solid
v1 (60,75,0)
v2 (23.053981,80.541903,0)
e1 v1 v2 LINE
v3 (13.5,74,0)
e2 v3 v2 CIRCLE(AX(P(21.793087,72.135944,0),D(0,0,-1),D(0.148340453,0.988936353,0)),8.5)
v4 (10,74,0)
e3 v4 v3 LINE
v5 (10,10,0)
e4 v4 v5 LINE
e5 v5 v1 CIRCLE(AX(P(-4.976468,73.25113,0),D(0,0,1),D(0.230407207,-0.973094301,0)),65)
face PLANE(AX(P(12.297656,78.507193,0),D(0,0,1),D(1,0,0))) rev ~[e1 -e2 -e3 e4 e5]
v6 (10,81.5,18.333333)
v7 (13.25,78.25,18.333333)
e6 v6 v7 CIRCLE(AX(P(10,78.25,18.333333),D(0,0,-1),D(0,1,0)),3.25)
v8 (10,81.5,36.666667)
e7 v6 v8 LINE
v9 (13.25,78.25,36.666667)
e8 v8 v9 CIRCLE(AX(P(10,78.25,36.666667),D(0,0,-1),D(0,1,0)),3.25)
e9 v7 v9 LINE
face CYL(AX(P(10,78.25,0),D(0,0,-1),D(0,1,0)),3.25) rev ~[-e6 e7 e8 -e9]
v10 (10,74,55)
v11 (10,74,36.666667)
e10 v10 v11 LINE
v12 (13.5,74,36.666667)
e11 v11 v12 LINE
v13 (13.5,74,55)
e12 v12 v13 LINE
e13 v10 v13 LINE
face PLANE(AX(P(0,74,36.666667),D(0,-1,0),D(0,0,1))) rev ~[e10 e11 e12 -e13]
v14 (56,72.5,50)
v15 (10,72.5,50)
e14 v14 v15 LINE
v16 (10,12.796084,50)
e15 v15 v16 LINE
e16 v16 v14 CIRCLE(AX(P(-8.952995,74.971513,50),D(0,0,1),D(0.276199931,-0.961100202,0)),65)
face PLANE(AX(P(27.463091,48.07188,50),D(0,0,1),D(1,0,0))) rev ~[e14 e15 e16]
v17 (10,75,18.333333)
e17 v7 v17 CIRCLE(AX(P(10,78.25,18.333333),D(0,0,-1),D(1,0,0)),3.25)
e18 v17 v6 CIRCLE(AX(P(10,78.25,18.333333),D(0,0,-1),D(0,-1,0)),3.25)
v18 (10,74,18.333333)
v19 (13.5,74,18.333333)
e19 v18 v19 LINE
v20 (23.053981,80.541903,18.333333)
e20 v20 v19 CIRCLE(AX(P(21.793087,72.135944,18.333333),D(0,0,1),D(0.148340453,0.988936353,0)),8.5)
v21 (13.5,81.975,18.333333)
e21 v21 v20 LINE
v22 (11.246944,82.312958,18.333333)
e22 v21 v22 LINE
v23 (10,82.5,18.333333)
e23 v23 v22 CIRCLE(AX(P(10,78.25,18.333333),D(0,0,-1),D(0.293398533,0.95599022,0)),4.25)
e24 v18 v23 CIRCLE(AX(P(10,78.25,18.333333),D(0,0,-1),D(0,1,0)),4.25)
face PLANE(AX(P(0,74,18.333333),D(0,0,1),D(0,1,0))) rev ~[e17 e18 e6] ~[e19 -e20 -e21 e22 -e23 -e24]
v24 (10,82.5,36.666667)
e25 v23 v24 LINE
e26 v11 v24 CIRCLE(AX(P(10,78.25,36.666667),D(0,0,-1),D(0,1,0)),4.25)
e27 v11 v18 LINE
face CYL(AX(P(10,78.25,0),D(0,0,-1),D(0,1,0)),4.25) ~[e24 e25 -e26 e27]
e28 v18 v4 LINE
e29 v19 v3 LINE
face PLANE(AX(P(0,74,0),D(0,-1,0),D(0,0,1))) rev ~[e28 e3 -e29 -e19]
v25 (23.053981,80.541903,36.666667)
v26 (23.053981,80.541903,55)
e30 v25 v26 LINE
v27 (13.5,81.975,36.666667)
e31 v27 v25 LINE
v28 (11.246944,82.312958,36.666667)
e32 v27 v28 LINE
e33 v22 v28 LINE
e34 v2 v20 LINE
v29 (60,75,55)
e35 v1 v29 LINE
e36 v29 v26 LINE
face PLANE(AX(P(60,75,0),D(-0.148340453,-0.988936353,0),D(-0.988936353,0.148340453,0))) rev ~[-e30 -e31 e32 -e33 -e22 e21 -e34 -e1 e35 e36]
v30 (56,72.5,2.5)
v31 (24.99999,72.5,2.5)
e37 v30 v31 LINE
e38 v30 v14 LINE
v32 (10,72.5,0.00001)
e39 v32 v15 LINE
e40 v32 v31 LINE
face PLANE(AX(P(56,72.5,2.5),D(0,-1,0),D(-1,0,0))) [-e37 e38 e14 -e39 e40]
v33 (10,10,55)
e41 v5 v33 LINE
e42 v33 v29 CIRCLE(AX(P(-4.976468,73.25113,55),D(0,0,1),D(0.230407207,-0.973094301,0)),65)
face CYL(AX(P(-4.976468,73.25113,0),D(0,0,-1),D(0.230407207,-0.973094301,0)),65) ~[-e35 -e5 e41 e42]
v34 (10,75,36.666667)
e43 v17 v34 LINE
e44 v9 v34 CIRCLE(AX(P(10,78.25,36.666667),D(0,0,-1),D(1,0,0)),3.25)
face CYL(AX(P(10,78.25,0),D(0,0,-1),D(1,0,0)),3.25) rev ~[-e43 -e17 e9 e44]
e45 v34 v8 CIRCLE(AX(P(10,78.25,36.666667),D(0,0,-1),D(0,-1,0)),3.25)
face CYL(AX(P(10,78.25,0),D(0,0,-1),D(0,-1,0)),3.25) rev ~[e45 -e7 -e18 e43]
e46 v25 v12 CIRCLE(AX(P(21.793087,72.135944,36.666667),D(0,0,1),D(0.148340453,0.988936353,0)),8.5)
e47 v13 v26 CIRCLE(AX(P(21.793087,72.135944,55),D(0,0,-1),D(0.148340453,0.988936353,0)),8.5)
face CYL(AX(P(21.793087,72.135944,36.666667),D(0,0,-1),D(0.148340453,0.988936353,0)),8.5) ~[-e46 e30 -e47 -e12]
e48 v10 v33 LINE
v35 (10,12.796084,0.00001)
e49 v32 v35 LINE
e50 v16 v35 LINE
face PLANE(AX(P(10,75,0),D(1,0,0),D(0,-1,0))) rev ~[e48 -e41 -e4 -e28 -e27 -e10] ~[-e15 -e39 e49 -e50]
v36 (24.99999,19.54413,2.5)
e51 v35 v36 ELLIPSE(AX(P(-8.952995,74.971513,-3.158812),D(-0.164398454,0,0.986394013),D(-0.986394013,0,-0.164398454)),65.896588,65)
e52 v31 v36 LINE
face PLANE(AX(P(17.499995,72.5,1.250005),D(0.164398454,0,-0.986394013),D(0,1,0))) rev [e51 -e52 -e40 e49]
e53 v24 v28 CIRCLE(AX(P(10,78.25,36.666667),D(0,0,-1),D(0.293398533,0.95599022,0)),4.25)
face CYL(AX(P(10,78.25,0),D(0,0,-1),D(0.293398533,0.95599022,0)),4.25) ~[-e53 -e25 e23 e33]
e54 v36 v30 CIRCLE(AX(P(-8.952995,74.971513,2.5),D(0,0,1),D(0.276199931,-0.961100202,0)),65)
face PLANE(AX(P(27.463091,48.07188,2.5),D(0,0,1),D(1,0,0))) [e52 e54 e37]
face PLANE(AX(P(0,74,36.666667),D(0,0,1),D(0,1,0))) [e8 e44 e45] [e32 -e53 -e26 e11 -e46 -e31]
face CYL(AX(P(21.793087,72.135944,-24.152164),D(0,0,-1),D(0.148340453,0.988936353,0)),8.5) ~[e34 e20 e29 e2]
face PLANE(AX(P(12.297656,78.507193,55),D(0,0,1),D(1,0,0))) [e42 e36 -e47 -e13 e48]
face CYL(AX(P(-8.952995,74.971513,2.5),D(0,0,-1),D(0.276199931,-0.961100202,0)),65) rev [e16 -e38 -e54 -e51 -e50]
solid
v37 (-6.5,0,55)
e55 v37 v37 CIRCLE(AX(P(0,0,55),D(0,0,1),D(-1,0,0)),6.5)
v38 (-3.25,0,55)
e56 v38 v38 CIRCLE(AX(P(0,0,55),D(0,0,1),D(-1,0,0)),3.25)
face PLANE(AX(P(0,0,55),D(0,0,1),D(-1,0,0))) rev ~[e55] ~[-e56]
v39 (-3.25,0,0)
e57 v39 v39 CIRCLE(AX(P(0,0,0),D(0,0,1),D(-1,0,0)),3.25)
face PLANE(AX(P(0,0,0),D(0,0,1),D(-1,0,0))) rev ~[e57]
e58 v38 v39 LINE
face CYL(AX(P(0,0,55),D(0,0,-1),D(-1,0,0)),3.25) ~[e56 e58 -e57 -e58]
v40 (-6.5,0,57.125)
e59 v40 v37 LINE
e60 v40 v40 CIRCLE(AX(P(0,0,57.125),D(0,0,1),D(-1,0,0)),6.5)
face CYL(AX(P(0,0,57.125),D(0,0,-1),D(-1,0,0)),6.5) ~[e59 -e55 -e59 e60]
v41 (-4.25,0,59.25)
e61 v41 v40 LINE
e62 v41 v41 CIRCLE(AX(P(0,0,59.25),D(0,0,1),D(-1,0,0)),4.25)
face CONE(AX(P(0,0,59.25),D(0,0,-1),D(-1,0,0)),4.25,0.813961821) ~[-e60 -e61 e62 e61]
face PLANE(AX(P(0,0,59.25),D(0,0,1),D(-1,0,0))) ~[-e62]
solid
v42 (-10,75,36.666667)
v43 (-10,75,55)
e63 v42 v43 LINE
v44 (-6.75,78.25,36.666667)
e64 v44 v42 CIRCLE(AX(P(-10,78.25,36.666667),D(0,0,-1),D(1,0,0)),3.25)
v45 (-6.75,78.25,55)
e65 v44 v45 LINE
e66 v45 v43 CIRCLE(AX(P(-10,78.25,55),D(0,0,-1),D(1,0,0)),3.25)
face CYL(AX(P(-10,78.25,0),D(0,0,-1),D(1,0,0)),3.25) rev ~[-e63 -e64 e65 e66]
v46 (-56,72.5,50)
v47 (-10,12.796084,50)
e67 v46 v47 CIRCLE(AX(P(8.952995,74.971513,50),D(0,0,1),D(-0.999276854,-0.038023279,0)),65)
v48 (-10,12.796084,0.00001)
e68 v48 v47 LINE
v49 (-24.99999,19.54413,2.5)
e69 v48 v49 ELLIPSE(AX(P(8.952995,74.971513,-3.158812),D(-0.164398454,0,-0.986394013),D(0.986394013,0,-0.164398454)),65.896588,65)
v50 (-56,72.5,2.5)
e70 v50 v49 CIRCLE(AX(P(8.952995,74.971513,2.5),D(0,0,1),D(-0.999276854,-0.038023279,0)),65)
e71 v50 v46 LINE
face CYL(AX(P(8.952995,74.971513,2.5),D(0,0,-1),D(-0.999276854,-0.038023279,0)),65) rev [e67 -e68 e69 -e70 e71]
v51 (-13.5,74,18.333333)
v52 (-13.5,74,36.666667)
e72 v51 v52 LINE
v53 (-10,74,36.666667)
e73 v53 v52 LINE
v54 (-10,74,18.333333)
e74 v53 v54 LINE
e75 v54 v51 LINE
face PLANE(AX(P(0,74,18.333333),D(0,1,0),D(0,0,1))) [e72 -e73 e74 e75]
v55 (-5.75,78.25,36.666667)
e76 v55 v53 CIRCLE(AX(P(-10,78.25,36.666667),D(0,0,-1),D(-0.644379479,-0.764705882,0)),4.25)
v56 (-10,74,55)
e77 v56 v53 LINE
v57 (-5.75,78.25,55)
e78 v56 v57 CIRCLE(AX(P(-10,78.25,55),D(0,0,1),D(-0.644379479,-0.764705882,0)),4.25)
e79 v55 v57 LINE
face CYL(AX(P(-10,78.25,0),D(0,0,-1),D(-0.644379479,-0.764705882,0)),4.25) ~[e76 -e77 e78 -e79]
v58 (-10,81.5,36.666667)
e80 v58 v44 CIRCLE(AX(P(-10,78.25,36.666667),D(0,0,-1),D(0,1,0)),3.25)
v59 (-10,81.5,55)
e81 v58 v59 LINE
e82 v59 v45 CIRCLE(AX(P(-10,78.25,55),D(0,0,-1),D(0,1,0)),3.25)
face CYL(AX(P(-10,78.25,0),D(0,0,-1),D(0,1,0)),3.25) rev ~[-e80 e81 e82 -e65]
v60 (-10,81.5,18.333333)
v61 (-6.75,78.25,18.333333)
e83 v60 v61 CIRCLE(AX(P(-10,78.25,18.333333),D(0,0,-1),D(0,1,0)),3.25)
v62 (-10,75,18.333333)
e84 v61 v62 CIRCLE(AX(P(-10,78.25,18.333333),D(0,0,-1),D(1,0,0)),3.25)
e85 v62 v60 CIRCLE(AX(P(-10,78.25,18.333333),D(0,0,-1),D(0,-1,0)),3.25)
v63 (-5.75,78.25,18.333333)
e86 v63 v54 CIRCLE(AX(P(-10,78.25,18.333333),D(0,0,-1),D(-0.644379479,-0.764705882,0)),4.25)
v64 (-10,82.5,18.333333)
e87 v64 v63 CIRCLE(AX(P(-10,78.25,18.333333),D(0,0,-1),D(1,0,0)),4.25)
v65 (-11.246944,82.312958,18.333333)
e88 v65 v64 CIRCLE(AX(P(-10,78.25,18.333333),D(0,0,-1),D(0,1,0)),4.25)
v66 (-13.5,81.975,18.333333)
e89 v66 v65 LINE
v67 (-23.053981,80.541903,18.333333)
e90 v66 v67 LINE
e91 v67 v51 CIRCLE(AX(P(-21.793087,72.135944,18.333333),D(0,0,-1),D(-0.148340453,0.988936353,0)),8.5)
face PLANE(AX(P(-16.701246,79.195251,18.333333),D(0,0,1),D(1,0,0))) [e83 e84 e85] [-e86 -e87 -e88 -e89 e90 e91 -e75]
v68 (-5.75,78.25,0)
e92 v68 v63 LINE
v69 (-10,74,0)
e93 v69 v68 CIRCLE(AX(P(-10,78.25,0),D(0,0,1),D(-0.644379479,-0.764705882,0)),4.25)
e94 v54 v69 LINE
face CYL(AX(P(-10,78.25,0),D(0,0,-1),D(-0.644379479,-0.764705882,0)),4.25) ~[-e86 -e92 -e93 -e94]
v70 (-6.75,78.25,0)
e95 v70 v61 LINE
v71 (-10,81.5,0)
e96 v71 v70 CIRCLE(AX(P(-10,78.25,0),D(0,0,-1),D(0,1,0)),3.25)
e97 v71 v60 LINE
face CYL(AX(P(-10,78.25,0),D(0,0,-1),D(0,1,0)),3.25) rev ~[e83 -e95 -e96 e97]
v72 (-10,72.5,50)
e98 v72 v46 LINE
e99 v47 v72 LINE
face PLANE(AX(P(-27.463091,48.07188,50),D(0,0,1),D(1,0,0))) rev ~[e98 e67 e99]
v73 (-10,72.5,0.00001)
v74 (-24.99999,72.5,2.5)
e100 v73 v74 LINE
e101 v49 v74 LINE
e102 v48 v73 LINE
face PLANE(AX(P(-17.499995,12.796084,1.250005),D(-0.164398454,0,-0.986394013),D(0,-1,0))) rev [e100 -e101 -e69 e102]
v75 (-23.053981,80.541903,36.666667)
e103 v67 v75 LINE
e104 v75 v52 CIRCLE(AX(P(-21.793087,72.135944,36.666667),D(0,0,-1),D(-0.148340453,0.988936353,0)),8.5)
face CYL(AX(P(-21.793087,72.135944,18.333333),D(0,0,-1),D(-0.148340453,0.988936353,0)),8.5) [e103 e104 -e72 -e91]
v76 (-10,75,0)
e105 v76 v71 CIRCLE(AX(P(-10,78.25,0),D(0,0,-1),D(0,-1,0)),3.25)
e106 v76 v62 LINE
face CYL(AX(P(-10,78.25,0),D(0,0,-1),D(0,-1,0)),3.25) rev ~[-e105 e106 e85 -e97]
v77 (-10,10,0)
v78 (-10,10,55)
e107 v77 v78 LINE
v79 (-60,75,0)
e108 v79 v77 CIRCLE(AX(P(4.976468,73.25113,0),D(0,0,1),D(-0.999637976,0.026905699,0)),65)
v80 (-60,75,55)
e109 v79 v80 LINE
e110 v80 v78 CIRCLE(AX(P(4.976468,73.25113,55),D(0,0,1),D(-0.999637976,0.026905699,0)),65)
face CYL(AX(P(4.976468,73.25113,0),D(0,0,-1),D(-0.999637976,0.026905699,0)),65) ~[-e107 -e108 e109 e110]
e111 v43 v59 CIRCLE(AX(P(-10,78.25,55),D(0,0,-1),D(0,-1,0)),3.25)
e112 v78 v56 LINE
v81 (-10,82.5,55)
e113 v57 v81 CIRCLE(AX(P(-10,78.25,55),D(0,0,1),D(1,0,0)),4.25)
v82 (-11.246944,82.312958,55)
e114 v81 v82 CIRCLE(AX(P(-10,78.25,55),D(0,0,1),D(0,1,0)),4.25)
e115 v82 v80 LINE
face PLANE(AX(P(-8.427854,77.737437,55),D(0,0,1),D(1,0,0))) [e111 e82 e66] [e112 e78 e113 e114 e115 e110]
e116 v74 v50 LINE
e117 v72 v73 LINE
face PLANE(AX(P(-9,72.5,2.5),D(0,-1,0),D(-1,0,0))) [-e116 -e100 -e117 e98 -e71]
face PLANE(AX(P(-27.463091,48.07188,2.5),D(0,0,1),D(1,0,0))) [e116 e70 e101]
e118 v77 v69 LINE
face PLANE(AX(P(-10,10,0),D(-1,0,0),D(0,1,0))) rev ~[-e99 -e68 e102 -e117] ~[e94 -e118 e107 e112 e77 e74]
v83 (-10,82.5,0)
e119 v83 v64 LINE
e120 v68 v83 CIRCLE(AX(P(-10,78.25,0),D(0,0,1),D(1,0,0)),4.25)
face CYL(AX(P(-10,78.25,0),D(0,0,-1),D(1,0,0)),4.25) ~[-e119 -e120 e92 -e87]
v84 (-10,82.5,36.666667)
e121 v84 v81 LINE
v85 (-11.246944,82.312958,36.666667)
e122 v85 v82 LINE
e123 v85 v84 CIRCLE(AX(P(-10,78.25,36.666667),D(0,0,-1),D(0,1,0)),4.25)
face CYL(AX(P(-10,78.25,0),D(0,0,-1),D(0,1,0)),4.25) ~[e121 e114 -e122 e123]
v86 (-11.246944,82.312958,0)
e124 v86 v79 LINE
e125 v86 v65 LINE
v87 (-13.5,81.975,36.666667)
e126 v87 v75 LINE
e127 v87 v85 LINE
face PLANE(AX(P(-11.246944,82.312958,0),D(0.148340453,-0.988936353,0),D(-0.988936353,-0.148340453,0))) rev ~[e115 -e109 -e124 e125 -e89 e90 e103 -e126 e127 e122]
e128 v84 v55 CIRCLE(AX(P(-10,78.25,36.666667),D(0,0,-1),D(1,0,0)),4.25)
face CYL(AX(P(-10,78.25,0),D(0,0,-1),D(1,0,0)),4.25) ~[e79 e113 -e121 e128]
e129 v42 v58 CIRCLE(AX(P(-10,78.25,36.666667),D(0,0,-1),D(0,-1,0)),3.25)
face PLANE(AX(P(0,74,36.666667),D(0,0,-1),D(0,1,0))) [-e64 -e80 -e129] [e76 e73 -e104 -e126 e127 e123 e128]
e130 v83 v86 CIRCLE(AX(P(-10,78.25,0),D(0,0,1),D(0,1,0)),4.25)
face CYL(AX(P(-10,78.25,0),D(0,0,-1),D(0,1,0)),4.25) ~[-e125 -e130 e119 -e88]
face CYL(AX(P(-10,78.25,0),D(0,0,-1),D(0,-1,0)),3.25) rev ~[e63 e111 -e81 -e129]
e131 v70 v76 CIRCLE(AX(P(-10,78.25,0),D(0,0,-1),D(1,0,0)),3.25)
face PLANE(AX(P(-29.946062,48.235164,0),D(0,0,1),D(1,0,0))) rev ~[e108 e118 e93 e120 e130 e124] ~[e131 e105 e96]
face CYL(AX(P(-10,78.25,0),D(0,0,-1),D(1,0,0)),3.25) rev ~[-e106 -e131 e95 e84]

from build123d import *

# Parameters (mm, degrees)
F2_DEPTH      = 55
F3_START      = 2.5
F3_DEPTH      = 47.5
F4_SIZE2      = 14.99999
F4_SIZE       = 2.49999
F4_2_SIZE2    = 14.99999
F4_2_SIZE     = 2.49999
F7_DEPTH      = 55
F8_W          = 8.5
F8_H          = 18.3333333333
F9_DEPTH      = 13.5
F10_DEPTH     = 13.5
F13_T1_DEPTH  = 42.4854968764
F13_T3_DEPTH  = 42.4854968764
F13_T8_DEPTH  = 66.6376604194
F13_T13_DEPTH = 66.6376604194
F14_T1_DEPTH  = 18.3333333333


# Not quite as in the source:
# - a fillet or chamfer that OpenCascade refuses, or shapes differently, is made with other operations: its cross-section is extruded or revolved along the edge and cut away or added
# - two fillets or chamfers of one size are made in one step
# - a fillet or chamfer is up to 0.001 mm smaller than in the source, because OpenCascade refuses the exact size


with BuildPart() as f2:
    # F0 (on Top) → F2 (new body)
    with BuildSketch(Plane.XY):
        with BuildLine():
            ThreePointArc((-60, 75), (-46.5440908417, 33.6199301218), (-10, 10))
            Line((-10, 10), (-10, 75))
            Line((-10, 75), (-60, 75))
        make_face()
    extrude(amount=F2_DEPTH)


with BuildPart() as f2b:
    # F0 (on Top) → F2, piece 2 (new body)
    with BuildSketch(Plane.XY):
        with BuildLine():
            ThreePointArc((10, 10), (46.5440908417, 33.6199301218), (60, 75))
            Line((60, 75), (10, 75))
            Line((10, 75), (10, 10))
        make_face()
    extrude(amount=F2_DEPTH)


with BuildPart() as f3_tool:
    # F1 (on Top) → F3 (new body)
    with BuildSketch(Plane.XY.offset(F3_START)):
        with BuildLine():
            Line((-9, 72.5), (-56, 72.5))
            ThreePointArc((-56, 72.5), (-42.2168279916, 34.8884847399), (-9, 12.5))
            Line((-9, 12.5), (-9, 72.5))
        make_face()
        with BuildLine():
            ThreePointArc((9, 12.5), (42.2168279916, 34.8884847399), (56, 72.5))
            Line((56, 72.5), (9, 72.5))
            Line((9, 72.5), (9, 12.5))
        make_face()
    extrude(amount=F3_DEPTH)


with BuildPart() as f2_1:
    add(f2.part)

    # F3: cut by f3_tool
    add(f3_tool.part, mode=Mode.SUBTRACT)

    # F4#2 (size 2.5 and 15 in the source; OpenCascade refuses exactly that, so slightly less here)
    f4_2_edges = [f2_1.edges().sort_by_distance(p)[0] for p in [
        (-10, 42.648042, 2.5),
    ]]
    chamfer(f4_2_edges, length=F4_2_SIZE, length2=F4_2_SIZE2)

    # F6 (on Top) → F7 (join, through all)
    with BuildSketch(Plane.XY):
        with BuildLine():
            ThreePointArc((-12.7386127875, 75), (-8.2078789587, 74.3963261459), (-5.75, 78.25))
            ThreePointArc((-5.75, 78.25), (-6.99479618, 81.25520382), (-10, 82.5))
            Line((-10, 82.5), (-10, 81.5))
            ThreePointArc((-10, 81.5), (-7.7019029611, 80.5480970389), (-6.75, 78.25))
            ThreePointArc((-6.75, 78.25), (-7.7019029611, 75.9519029611), (-10, 75))
            Line((-10, 75), (-12.7386127875, 75))
        make_face()
        with BuildLine():
            Line((-11.2469437653, 82.3129584352), (-10, 82.5))
            ThreePointArc((-10, 82.5), (-10.630446925, 82.4529794997), (-11.2469437653, 82.3129584352))
        make_face()
        with BuildLine():
            Line((-10, 81.5), (-10, 82.5))
            Line((-10, 82.5), (-11.2469437653, 82.3129584352))
            ThreePointArc((-11.2469437653, 82.3129584352), (-14.1642532977, 79.0994083072), (-12.7386127875, 75))
            Line((-12.7386127875, 75), (-10, 75))
            ThreePointArc((-10, 75), (-13.25, 78.25), (-10, 81.5))
        make_face()
        with BuildLine():
            Line((-60, 75), (-12.7386127875, 75))
            ThreePointArc((-12.7386127875, 75), (-14.1642532977, 79.0994083072), (-11.2469437653, 82.3129584352))
            Line((-11.2469437653, 82.3129584352), (-60, 75))
        make_face()
    extrude(amount=F7_DEPTH)

    # F8 (on Right) → F10 (cut)
    with BuildSketch(Plane.YZ):
        with Locations((78.25, 27.5)):
            Rectangle(F8_W, F8_H)
    extrude(amount=-F10_DEPTH, mode=Mode.SUBTRACT)

    # F14: fillet of radius 8.5 on 1 edges, made by hand

    # F14_s2 → F14_t1 (cut)
    with BuildSketch(Plane.XY.offset(18.3333333333)):
        with BuildLine():
            ThreePointArc((-23.0539810113, 80.5419028483), (-16.9907899078, 79.1493553646), (-13.5, 74))
            Line((-13.5, 74), (-13.5, 81.975))
            Line((-13.5, 81.975), (-23.0539810113, 80.5419028483))
        make_face()
    extrude(amount=F14_T1_DEPTH, mode=Mode.SUBTRACT)


with BuildPart() as f2b_1:
    add(f2b.part)

    # F3: cut by f3_tool
    add(f3_tool.part, mode=Mode.SUBTRACT)

    # F4 (size 2.5 and 15 in the source; OpenCascade refuses exactly that, so slightly less here)
    f4_edges = [f2b_1.edges().sort_by_distance(p)[0] for p in [
        (10, 42.648042, 2.5),
    ]]
    chamfer(f4_edges, length=F4_SIZE, length2=F4_SIZE2)

    # F6 (on Top) → F7, piece 2 (join, through all)
    with BuildSketch(Plane.XY):
        with BuildLine():
            ThreePointArc((12.7386127875, 75), (13.8536738541, 76.4578789587), (14.25, 78.25))
            ThreePointArc((14.25, 78.25), (13.4177486012, 80.7761620096), (11.2469437653, 82.3129584352))
            Line((11.2469437653, 82.3129584352), (10, 82.5))
            Line((10, 82.5), (10, 81.5))
            ThreePointArc((10, 81.5), (12.2980970389, 80.5480970389), (13.25, 78.25))
            ThreePointArc((13.25, 78.25), (12.2980970389, 75.9519029611), (10, 75))
            Line((10, 75), (12.7386127875, 75))
        make_face()
        with BuildLine():
            ThreePointArc((11.2469437653, 82.3129584352), (13.4177486012, 80.7761620096), (14.25, 78.25))
            ThreePointArc((14.25, 78.25), (13.8536738541, 76.4578789587), (12.7386127875, 75))
            Line((12.7386127875, 75), (60, 75))
            Line((60, 75), (11.2469437653, 82.3129584352))
        make_face()
        with BuildLine():
            Line((10, 82.5), (11.2469437653, 82.3129584352))
            ThreePointArc((11.2469437653, 82.3129584352), (10.630446925, 82.4529794997), (10, 82.5))
        make_face()
        with BuildLine():
            ThreePointArc((10, 82.5), (6.0078201443, 76.7922620263), (12.7386127875, 75))
            Line((12.7386127875, 75), (10, 75))
            ThreePointArc((10, 75), (6.75, 78.25), (10, 81.5))
            Line((10, 81.5), (10, 82.5))
        make_face()
    extrude(amount=F7_DEPTH)

    # F8 (on Right) → F9 (cut)
    with BuildSketch(Plane.YZ):
        with Locations((78.25, 45.8333333333)):
            Rectangle(F8_W, F8_H)
        with Locations((78.25, 9.1666666667)):
            Rectangle(F8_W, F8_H)
    extrude(amount=F9_DEPTH, mode=Mode.SUBTRACT)

    # F13: fillet of radius 8.5 on 2 edges, made by hand

    # F13_s2 → F13_t1 (cut)
    with BuildSketch(Plane.XY.offset(36.6666666667)):
        with BuildLine():
            ThreePointArc((23.0539810113, 80.5419028483), (16.9907899078, 79.1493553646), (13.5, 74))
            Line((13.5, 74), (13.5, 81.975))
            Line((13.5, 81.975), (23.0539810113, 80.5419028483))
        make_face()
    extrude(amount=F13_T1_DEPTH, mode=Mode.SUBTRACT)

    # F13_s4 → F13_t3 (cut)
    with BuildSketch(Plane.XY.offset(-24.152163543)):
        with BuildLine():
            ThreePointArc((23.0539810113, 80.5419028483), (16.9907899078, 79.1493553646), (13.5, 74))
            Line((13.5, 74), (13.5, 81.975))
            Line((13.5, 81.975), (23.0539810113, 80.5419028483))
        make_face()
    extrude(amount=F13_T3_DEPTH, mode=Mode.SUBTRACT)


with BuildPart() as f12:
    # F11 (on Front) → F12 (revolve)
    with BuildSketch(Plane.XZ):
        Polygon((-3.25, 0), (0, 0), (0, 59.25), (-4.25, 59.25), (-6.5, 57.125), (-6.5, 55), (-3.25, 55), align=None)
    revolve(axis=Axis((0, 0, 29.625), (0, 0, 1)))


with BuildPart() as f13_tool6:
    # F13_s7 → F13_t8 (new body)
    with BuildSketch(Plane.XY.offset(12.5145031236)):
        with BuildLine():
            ThreePointArc((23.0539810113, 80.5419028483), (16.9907899078, 79.1493553646), (13.5, 74))
            Line((13.5, 74), (13.5, 81.975))
            Line((13.5, 81.975), (23.0539810113, 80.5419028483))
        make_face()
    extrude(amount=F13_T8_DEPTH)

    split(bisect_by=Plane.XY.offset(18.3333333333), keep=Keep.BOTTOM)


with BuildPart() as f2b_2:
    add(f2b_1.part)

    # F13_t5: cut F13_tool6
    add(f13_tool6.part, mode=Mode.SUBTRACT)


with BuildPart() as f13_tool11:
    # F13_s12 → F13_t13 (new body)
    with BuildSketch(Plane.XY.offset(-24.152163543)):
        with BuildLine():
            ThreePointArc((23.0539810113, 80.5419028483), (16.9907899078, 79.1493553646), (13.5, 74))
            Line((13.5, 74), (13.5, 81.975))
            Line((13.5, 81.975), (23.0539810113, 80.5419028483))
        make_face()
    extrude(amount=F13_T13_DEPTH)

    split(bisect_by=Plane.XY.offset(36.6666666667), keep=Keep.TOP)


with BuildPart() as f2b_3:
    add(f2b_2.part)

    # F13_t10: cut F13_tool11
    add(f13_tool11.part, mode=Mode.SUBTRACT)


solid = Compound([f2_1.part, f12.part, f2b_3.part])
